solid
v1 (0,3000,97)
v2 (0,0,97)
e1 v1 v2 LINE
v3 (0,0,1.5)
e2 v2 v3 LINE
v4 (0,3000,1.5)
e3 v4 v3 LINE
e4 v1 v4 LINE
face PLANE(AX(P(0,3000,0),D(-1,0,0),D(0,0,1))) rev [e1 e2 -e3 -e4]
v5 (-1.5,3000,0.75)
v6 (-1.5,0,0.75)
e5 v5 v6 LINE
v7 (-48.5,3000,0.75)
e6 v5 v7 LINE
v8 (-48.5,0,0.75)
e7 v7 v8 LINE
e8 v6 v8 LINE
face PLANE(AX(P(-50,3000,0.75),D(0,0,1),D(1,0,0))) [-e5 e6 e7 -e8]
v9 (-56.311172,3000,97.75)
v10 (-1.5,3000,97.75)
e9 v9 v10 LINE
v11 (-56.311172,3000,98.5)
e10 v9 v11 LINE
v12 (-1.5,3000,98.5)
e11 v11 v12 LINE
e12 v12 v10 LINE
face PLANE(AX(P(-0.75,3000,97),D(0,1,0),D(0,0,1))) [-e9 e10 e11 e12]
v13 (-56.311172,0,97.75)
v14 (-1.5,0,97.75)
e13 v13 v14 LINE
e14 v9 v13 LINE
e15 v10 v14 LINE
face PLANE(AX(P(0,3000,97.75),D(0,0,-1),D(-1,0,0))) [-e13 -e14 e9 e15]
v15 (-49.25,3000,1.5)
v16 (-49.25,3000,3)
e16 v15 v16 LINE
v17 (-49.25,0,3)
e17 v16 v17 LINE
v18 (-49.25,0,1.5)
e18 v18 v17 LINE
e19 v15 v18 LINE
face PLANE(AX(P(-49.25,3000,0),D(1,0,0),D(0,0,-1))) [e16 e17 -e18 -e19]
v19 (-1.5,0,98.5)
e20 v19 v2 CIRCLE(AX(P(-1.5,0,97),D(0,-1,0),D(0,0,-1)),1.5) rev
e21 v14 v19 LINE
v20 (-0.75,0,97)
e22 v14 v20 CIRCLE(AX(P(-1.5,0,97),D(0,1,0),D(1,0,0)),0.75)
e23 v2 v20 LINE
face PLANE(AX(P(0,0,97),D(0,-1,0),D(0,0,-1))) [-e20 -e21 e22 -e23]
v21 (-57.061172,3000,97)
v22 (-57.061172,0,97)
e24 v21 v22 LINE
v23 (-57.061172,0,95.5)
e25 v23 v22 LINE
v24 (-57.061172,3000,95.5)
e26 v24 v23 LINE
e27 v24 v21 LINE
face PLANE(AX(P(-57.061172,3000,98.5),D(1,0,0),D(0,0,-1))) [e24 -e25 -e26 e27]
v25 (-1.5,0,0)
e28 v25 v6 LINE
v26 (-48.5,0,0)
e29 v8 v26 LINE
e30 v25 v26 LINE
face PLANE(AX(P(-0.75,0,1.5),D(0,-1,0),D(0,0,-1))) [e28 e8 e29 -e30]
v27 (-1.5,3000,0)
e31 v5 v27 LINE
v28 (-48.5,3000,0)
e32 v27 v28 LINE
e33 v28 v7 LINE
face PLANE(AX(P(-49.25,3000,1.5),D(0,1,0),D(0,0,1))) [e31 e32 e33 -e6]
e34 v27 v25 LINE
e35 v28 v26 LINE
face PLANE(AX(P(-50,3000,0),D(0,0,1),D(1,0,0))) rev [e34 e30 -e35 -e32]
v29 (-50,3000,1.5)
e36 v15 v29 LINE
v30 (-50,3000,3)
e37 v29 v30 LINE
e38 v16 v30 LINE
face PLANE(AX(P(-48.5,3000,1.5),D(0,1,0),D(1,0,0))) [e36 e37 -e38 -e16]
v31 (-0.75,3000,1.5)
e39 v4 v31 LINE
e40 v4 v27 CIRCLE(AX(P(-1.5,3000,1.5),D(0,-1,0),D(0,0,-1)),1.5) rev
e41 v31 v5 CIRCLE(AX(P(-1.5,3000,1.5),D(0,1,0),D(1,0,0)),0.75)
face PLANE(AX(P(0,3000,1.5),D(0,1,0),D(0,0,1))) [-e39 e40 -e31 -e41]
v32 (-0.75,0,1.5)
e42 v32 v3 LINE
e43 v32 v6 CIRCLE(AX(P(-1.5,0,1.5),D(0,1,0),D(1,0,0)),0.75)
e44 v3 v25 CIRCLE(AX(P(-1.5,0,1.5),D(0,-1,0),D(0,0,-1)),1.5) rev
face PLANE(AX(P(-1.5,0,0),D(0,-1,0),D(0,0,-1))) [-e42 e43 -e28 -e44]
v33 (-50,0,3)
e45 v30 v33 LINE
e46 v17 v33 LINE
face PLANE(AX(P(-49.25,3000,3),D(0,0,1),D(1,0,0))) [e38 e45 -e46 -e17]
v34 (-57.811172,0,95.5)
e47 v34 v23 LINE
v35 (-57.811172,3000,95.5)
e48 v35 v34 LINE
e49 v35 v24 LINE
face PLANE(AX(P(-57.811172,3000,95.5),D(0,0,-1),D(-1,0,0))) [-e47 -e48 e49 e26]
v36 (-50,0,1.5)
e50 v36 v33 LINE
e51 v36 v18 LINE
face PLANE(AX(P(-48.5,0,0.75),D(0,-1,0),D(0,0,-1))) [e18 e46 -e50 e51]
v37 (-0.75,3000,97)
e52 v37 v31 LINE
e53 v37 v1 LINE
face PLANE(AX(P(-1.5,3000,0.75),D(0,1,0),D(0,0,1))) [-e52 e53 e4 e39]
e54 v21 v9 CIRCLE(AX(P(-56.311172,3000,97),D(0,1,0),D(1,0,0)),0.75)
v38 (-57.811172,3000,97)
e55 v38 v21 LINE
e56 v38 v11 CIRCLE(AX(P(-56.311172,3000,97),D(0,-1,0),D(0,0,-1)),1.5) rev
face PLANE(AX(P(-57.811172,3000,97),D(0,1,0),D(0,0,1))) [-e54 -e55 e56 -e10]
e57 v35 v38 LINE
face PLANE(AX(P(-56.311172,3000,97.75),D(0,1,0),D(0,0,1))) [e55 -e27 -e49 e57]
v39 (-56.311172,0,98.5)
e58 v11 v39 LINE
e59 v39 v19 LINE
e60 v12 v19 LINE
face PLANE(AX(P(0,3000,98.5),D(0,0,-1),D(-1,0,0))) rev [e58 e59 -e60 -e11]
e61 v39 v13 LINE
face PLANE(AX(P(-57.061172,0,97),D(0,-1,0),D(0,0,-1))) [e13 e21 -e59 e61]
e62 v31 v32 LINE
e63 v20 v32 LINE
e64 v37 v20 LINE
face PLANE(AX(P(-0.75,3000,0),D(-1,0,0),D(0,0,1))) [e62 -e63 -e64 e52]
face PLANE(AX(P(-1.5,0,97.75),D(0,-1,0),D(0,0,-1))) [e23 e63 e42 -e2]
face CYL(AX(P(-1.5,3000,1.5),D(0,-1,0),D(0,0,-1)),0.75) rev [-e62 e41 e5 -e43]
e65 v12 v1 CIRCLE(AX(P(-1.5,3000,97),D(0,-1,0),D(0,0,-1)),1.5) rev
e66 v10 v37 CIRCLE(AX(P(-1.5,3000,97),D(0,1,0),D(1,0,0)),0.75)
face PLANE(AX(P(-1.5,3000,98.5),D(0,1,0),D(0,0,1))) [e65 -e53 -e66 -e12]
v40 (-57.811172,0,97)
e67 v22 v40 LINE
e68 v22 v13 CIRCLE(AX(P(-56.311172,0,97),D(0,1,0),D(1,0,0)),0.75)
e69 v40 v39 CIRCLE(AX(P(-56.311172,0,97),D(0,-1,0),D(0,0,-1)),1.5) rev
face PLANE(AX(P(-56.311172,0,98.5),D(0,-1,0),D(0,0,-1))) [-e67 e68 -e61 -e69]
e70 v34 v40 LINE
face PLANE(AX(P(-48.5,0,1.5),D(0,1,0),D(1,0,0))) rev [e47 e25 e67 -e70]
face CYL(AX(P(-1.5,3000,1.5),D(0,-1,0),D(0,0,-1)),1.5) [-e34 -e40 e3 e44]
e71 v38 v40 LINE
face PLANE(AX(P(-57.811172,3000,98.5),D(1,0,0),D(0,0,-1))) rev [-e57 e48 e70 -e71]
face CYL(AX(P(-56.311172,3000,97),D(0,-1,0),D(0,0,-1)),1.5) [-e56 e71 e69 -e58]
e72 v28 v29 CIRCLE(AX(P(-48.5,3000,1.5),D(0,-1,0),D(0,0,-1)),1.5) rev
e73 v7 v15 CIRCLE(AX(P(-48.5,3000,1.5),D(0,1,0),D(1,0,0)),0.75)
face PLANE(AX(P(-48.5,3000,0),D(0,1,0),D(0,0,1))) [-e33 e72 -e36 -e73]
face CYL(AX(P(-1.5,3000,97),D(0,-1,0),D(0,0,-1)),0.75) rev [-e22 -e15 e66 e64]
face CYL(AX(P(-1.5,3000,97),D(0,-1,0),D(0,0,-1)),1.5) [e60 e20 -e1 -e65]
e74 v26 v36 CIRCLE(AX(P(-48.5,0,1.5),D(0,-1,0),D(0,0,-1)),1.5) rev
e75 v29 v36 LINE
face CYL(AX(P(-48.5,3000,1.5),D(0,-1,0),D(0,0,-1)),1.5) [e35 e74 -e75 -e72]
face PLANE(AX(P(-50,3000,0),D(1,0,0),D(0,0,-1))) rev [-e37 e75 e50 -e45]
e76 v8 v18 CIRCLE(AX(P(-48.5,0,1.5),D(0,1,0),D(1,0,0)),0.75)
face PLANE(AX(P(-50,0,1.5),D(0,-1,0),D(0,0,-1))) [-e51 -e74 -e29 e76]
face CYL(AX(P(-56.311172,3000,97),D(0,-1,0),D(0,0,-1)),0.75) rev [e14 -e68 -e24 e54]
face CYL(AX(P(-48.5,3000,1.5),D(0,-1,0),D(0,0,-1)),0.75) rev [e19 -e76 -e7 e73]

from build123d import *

# Parameters (mm, degrees)
SM_BASE_FLANGE_1_DEPTH = 3000


# Sheet-metal steps are written as plain solids
with BuildPart() as part:
    # Sketch 1 → Базовая кромка1 (new body)
    with BuildSketch(Plane(origin=(0, 0, 0), x_dir=(1, 0, 0), z_dir=(0, 1, 0))):
        with BuildLine():
            Line((-50, -3), (-50, -1.5))
            ThreePointArc((-50, -1.5), (-49.560660172, -0.439339828), (-48.5, 0))
            Line((-48.5, 0), (-1.5, 0))
            ThreePointArc((-1.5, 0), (-0.439339828, -0.439339828), (0, -1.5))
            Line((0, -1.5), (0, -97))
            ThreePointArc((0, -97), (-0.439339828, -98.060660172), (-1.5, -98.5))
            Line((-1.5, -98.5), (-56.31117163, -98.5))
            ThreePointArc((-56.31117163, -98.5), (-57.371831802, -98.060660172), (-57.81117163, -97))
            Line((-57.81117163, -97), (-57.81117163, -95.5))
            Line((-57.81117163, -95.5), (-57.06117163, -95.5))
            Line((-57.06117163, -95.5), (-57.06117163, -97))
            ThreePointArc((-57.06117163, -97), (-56.841501716, -97.530330086), (-56.31117163, -97.75))
            Line((-56.31117163, -97.75), (-1.5, -97.75))
            ThreePointArc((-1.5, -97.75), (-0.969669914, -97.530330086), (-0.75, -97))
            Line((-0.75, -97), (-0.75, -1.5))
            ThreePointArc((-0.75, -1.5), (-0.969669914, -0.969669914), (-1.5, -0.75))
            Line((-1.5, -0.75), (-48.5, -0.75))
            ThreePointArc((-48.5, -0.75), (-49.030330086, -0.969669914), (-49.25, -1.5))
            Line((-49.25, -1.5), (-49.25, -3))
            Line((-49.25, -3), (-50, -3))
        make_face()
    extrude(amount=SM_BASE_FLANGE_1_DEPTH)


solid = part.part
